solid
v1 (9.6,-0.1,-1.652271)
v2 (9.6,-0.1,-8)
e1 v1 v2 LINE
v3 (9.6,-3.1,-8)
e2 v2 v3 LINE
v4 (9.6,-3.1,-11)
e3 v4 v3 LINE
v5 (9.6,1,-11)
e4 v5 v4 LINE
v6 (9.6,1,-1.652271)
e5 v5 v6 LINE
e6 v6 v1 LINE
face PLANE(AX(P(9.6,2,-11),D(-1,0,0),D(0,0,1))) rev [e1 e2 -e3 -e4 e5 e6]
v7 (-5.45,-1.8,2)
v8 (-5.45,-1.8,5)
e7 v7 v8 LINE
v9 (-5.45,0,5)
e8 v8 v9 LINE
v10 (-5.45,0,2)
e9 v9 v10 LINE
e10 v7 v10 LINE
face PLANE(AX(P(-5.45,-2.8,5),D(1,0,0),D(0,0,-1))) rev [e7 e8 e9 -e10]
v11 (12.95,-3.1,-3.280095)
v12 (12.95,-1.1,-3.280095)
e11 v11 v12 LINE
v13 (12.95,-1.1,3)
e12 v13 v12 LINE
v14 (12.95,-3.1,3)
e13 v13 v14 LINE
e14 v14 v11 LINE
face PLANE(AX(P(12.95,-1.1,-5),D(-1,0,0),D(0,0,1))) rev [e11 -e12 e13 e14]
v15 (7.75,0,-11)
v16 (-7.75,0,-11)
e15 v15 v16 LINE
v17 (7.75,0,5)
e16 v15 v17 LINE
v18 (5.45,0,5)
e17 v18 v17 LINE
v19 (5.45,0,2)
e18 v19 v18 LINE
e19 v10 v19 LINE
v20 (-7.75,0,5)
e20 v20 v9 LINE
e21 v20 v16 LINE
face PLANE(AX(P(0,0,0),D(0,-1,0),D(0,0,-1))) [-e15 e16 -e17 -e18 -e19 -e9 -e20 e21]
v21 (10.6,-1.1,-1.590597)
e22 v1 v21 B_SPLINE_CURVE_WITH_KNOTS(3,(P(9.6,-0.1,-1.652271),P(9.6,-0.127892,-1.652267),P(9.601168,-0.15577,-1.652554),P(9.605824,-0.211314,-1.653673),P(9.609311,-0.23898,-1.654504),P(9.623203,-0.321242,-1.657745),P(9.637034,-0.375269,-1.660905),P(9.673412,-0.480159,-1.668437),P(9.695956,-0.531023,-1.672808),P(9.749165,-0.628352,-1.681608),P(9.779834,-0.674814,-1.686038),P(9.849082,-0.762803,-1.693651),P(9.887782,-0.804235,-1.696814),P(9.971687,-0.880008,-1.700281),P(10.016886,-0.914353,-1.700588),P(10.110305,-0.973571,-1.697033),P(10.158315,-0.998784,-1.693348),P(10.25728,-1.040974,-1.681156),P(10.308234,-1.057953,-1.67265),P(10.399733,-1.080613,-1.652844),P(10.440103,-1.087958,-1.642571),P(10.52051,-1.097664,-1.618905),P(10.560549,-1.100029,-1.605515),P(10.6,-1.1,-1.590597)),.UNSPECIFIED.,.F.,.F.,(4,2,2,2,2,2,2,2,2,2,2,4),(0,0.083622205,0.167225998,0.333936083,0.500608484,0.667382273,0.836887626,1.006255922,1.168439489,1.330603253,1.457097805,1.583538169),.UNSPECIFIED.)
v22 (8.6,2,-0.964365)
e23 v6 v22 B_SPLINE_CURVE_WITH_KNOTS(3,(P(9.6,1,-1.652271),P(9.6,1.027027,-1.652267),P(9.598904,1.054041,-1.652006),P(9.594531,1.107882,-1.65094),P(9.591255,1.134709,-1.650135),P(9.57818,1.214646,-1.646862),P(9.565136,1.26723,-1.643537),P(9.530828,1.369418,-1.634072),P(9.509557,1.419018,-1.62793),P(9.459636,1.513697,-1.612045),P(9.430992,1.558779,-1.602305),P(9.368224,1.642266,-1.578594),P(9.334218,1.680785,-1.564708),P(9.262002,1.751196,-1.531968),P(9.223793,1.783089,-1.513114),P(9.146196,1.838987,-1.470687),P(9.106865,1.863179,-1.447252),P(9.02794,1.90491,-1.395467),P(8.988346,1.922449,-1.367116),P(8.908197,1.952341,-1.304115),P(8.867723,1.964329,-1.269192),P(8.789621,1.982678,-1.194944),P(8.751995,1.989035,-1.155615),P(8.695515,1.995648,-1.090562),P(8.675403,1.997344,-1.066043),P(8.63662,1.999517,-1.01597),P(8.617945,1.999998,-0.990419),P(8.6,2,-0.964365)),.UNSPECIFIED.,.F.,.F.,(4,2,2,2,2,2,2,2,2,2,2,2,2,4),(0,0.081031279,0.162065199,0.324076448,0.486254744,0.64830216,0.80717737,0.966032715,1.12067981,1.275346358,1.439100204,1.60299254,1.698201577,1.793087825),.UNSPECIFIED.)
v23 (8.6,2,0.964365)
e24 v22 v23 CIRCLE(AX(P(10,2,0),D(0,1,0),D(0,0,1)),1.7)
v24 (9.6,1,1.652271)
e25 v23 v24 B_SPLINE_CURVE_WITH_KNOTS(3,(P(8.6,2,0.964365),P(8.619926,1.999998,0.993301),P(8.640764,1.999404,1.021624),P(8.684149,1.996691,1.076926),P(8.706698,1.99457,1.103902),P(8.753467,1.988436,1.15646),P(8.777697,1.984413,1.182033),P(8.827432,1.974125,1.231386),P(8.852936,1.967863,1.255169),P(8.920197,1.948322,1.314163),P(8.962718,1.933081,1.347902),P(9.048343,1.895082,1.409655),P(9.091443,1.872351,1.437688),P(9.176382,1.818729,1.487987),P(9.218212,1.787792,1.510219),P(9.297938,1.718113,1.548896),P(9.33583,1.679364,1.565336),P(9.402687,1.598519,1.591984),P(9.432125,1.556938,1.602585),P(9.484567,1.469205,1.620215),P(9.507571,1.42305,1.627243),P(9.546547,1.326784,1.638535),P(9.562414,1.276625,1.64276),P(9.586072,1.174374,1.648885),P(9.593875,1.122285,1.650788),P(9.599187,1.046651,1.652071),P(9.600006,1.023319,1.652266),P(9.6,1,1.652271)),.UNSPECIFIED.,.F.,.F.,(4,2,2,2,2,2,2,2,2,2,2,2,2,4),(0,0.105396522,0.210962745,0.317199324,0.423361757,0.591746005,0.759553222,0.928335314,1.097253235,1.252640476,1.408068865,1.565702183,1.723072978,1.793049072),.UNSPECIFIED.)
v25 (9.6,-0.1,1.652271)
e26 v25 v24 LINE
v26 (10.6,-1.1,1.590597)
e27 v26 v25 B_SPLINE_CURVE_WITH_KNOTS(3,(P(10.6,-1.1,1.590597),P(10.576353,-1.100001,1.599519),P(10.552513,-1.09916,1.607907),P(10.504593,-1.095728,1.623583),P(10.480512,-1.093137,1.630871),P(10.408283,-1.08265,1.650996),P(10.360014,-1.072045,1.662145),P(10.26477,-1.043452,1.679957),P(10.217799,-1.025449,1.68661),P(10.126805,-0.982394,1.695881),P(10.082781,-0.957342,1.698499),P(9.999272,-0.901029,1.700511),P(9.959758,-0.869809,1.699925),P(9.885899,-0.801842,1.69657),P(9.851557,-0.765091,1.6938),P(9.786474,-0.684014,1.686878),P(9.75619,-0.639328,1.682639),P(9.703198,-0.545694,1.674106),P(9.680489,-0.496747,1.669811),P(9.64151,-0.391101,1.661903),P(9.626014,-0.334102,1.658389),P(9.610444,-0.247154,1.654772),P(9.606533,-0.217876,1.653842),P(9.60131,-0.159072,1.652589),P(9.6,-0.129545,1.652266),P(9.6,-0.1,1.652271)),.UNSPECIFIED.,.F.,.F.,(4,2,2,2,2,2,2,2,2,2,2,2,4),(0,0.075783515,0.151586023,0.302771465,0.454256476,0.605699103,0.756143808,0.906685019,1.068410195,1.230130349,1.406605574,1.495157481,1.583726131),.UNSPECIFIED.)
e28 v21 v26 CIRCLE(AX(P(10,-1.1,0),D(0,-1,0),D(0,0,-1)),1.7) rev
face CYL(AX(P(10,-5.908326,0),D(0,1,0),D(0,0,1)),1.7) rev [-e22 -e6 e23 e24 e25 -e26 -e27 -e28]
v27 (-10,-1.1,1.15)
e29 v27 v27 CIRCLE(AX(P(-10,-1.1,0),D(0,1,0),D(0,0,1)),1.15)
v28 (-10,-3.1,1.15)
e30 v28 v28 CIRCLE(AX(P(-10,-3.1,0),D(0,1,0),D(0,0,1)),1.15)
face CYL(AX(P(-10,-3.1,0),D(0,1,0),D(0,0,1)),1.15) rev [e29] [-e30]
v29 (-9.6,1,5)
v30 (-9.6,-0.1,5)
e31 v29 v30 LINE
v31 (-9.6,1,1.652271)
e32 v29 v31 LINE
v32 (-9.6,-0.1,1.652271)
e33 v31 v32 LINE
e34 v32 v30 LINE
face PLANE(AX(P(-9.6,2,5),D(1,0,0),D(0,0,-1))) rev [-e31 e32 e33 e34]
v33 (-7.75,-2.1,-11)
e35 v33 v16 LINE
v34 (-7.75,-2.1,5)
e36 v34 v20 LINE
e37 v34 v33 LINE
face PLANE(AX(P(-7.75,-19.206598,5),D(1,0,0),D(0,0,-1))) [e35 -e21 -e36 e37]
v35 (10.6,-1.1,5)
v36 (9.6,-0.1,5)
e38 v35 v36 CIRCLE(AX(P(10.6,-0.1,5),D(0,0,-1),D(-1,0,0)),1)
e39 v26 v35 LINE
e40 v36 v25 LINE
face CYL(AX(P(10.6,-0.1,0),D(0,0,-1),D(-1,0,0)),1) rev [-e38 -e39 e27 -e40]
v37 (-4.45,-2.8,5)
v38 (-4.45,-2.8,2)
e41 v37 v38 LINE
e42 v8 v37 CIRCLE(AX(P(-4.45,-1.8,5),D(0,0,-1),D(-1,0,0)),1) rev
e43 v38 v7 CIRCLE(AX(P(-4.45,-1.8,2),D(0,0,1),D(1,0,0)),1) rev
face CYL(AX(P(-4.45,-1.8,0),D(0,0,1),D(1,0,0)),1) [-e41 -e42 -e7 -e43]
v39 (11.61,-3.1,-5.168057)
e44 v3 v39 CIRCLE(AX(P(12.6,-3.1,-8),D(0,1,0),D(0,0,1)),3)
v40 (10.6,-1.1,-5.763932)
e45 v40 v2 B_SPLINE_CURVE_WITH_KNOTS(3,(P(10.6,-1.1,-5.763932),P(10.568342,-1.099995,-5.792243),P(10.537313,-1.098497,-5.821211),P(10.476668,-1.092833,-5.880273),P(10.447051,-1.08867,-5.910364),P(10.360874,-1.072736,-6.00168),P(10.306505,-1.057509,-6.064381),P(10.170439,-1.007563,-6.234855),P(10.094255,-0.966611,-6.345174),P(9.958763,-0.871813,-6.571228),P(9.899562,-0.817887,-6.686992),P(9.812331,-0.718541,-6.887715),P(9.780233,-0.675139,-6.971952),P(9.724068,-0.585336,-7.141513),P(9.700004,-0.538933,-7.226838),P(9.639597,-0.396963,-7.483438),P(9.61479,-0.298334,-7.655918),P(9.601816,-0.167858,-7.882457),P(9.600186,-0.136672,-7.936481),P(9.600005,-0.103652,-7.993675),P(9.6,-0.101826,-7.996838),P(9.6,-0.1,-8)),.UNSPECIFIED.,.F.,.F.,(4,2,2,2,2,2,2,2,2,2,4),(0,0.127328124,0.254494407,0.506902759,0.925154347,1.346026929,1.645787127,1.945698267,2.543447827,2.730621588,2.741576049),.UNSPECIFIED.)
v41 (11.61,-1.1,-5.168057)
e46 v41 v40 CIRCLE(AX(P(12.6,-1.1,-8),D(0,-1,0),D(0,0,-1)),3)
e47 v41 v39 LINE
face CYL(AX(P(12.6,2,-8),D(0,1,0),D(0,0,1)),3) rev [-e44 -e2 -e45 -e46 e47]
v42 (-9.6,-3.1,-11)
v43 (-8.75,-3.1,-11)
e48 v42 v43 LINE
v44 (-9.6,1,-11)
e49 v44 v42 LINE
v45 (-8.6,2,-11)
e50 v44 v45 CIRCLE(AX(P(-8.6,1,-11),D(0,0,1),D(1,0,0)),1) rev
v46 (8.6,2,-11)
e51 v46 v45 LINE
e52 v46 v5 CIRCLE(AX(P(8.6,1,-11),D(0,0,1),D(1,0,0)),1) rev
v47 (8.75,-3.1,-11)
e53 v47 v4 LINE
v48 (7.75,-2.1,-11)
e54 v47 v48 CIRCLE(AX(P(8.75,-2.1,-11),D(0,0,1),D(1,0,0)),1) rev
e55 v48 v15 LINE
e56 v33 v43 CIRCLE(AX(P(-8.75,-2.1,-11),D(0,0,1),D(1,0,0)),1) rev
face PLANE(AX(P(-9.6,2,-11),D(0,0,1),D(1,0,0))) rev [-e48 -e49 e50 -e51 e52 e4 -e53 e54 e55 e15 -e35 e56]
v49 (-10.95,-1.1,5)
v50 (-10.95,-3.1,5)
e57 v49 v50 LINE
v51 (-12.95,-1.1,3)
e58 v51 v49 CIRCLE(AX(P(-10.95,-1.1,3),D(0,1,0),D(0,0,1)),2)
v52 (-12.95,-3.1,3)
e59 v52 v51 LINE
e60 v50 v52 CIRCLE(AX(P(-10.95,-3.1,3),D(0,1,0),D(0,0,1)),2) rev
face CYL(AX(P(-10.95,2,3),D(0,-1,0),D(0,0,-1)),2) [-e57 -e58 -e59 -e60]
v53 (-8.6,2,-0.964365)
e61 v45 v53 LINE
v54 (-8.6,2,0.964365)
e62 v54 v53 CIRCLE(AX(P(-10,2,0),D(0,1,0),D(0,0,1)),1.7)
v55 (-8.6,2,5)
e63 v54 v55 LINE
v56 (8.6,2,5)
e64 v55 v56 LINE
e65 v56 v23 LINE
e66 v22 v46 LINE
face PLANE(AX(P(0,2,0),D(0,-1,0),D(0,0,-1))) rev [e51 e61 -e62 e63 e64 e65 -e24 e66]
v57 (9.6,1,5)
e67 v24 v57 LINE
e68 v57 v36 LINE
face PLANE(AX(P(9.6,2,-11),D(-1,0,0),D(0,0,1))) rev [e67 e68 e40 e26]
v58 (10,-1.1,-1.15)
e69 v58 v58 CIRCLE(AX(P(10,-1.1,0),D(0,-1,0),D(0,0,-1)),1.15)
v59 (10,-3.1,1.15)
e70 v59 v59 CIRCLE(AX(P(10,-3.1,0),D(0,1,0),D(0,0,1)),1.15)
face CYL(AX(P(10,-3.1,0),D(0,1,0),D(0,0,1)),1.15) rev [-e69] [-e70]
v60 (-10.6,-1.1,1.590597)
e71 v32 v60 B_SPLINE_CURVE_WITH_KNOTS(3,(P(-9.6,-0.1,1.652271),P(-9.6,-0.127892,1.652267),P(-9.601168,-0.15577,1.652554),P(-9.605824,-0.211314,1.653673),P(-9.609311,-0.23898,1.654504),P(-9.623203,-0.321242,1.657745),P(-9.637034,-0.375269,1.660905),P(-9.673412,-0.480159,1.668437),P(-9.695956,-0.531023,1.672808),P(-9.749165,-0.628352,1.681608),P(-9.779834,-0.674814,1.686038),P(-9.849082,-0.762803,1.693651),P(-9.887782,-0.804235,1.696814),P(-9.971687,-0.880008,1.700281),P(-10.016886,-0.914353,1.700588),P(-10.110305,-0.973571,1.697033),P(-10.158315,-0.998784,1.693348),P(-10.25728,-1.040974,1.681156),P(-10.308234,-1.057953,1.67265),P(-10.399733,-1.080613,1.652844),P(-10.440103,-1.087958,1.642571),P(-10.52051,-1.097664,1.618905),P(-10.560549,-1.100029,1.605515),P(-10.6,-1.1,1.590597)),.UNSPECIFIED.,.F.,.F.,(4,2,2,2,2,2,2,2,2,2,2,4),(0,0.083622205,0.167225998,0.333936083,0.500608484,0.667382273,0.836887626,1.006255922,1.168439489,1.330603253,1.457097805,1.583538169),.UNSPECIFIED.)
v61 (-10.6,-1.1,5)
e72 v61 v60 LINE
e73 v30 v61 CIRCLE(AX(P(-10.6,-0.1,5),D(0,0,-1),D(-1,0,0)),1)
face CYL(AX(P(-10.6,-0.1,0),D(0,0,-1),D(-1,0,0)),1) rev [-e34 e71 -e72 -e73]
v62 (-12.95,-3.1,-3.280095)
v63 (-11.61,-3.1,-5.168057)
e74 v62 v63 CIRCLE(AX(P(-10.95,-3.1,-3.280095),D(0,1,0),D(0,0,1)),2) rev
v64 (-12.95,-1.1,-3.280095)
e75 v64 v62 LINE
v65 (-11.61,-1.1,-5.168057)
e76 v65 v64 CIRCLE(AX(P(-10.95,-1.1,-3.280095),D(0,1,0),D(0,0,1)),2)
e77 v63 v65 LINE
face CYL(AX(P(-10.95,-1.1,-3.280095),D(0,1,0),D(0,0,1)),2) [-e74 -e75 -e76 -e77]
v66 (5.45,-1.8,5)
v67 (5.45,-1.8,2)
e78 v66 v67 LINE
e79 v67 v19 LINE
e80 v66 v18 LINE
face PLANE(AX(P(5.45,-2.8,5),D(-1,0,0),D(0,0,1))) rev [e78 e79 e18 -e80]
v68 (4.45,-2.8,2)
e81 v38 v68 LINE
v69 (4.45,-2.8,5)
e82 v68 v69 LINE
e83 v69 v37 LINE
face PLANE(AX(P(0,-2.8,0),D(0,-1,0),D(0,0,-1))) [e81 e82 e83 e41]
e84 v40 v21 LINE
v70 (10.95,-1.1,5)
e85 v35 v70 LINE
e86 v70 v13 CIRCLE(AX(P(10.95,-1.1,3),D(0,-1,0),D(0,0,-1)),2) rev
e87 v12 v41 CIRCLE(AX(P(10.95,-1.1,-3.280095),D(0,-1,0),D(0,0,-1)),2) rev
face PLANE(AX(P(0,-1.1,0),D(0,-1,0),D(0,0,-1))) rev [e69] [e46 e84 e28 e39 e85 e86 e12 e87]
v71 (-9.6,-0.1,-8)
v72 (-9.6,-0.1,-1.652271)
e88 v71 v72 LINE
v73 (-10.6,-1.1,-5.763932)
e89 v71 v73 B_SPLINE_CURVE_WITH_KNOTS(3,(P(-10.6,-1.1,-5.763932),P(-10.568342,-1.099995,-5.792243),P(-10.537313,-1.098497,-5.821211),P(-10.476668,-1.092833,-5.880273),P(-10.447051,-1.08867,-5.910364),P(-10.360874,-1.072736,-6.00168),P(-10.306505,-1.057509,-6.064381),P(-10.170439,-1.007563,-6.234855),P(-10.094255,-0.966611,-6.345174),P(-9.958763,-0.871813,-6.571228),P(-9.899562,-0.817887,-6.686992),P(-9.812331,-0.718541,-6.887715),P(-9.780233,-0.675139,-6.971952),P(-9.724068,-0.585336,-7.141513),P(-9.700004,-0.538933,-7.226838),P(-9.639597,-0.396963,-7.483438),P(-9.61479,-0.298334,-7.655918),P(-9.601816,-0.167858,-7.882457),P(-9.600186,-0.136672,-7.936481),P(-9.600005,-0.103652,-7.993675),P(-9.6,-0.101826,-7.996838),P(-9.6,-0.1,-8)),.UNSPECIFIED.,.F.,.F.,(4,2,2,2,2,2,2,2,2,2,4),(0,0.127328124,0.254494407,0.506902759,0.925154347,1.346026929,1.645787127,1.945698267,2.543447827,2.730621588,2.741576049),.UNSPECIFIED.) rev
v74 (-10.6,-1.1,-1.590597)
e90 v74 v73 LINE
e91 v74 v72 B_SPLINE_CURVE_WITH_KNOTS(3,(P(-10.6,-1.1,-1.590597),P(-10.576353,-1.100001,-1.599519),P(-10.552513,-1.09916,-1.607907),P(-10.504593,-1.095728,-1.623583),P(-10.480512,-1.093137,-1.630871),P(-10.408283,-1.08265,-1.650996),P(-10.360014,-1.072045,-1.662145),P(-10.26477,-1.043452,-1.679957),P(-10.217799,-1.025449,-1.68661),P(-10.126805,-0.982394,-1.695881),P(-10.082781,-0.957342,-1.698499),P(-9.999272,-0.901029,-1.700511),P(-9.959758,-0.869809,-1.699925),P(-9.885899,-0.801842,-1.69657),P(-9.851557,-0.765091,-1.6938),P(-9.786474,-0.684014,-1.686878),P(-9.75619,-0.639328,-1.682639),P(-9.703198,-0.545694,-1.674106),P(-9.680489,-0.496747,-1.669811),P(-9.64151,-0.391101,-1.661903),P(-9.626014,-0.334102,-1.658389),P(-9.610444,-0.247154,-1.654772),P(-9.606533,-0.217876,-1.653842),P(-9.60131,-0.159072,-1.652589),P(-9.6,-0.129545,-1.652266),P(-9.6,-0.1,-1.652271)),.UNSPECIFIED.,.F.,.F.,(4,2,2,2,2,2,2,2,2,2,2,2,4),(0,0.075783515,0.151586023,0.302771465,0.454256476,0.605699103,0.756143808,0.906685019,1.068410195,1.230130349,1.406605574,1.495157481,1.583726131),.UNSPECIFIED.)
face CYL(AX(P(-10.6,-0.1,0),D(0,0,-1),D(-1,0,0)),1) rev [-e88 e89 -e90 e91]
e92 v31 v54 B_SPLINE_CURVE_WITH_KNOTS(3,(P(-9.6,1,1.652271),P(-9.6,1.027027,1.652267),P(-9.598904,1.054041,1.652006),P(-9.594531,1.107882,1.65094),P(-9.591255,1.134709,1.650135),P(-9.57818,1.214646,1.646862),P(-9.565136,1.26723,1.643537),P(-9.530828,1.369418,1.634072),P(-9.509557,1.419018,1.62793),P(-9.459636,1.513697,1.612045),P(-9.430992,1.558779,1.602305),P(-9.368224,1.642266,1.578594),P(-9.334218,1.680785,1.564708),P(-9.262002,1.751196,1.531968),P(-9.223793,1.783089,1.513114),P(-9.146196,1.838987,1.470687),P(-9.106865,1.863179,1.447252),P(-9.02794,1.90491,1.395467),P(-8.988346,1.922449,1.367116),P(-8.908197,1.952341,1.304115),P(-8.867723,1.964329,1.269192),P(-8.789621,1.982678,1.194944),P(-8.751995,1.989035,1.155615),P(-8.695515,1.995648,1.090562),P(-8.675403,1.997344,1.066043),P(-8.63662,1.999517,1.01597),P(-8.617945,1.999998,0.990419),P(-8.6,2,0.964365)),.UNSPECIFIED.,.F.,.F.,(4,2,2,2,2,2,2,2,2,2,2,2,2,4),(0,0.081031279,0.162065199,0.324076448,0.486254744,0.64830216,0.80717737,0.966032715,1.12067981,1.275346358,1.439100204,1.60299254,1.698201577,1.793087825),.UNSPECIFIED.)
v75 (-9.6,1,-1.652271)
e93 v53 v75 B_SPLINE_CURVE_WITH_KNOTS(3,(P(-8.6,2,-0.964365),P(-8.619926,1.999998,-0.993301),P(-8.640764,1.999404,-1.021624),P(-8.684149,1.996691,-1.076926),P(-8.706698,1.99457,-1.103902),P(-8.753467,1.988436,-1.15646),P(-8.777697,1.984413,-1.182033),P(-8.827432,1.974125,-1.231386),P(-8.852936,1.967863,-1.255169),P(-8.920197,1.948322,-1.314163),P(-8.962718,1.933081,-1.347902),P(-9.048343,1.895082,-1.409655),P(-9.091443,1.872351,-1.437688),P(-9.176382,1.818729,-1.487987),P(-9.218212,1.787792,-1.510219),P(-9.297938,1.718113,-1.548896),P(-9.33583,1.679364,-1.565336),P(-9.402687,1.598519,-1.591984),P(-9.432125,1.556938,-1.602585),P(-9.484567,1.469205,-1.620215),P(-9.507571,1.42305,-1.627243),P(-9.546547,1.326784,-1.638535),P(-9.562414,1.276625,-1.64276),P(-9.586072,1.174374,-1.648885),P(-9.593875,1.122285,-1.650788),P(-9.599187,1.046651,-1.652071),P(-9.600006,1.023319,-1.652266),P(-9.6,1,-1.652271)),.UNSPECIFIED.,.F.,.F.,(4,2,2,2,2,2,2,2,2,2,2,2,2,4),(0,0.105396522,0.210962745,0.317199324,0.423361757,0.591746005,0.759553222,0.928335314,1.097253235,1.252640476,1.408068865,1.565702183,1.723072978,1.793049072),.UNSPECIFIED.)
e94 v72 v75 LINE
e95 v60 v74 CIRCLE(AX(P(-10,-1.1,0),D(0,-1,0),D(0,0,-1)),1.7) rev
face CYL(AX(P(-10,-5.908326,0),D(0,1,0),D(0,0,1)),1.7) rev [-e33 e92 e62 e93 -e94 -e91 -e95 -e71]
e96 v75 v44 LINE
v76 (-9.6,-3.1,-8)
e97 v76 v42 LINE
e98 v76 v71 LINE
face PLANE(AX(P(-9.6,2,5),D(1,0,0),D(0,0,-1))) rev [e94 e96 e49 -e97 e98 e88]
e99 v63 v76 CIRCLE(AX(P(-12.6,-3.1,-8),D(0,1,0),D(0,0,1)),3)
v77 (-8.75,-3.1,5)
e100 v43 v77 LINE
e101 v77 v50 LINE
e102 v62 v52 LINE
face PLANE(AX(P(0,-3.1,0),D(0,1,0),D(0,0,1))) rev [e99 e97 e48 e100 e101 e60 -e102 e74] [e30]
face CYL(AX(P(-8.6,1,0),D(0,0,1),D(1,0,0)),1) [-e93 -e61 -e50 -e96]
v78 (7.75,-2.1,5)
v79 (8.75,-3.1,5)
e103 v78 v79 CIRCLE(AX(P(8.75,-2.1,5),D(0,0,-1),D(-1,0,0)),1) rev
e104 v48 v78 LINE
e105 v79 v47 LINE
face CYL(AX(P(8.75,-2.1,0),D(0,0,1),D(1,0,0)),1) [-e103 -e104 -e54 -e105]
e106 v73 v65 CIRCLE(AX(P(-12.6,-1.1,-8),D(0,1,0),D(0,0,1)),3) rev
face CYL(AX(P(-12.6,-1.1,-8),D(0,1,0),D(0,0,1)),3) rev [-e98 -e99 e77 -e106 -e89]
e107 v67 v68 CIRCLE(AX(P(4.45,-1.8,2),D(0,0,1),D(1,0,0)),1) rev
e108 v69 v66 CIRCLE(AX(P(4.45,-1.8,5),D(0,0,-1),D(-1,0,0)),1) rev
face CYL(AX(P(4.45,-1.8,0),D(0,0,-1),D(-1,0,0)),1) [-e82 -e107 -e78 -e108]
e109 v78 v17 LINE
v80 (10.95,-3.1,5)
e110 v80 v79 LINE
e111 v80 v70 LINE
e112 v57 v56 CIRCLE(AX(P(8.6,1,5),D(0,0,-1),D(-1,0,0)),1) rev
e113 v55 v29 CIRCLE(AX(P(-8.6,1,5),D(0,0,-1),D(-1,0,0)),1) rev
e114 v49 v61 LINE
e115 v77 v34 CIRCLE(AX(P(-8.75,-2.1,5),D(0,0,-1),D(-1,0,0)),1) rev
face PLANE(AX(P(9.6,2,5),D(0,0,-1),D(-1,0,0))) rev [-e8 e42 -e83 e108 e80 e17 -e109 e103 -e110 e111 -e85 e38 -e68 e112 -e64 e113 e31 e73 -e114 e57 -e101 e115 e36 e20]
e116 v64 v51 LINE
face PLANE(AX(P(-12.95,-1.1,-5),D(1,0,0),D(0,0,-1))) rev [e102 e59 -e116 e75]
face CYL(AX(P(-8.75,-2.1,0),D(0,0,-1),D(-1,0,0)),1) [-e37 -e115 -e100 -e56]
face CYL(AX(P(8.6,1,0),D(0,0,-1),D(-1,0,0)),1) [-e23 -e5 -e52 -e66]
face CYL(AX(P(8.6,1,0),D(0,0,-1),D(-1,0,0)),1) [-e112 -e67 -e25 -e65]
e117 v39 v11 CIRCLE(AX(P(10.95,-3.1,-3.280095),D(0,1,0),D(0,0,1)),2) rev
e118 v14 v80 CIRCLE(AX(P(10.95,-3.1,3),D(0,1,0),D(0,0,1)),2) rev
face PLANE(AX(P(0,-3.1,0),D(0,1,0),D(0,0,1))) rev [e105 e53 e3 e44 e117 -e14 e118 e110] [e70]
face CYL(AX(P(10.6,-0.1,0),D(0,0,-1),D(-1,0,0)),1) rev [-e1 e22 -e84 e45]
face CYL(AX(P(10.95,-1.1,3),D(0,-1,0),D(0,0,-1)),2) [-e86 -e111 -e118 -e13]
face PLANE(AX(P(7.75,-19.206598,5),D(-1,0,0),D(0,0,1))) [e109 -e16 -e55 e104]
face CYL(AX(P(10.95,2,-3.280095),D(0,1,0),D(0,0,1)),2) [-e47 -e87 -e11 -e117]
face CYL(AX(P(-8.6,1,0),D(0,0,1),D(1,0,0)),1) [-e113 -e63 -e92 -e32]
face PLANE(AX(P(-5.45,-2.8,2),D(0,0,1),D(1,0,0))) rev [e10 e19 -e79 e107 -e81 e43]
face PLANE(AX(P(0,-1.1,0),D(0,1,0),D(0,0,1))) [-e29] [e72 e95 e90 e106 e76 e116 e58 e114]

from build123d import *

# Parameters (mm, degrees)
BOSS_EXTRUDE1_DEPTH = 2
SKETCH3_W           = 1.85
SKETCH3_H           = 16
BOSS_EXTRUDE2_DEPTH = 3.1
SKETCH4_W           = 3.35
SKETCH4_H           = 10
BOSS_EXTRUDE3_DEPTH = 2
SKETCH5_W           = 10.9
SKETCH5_H           = 3
BOSS_EXTRUDE4_DEPTH = 2.8
FILLET2_R           = 1
SKETCH7_R           = 1.15
CUT_EXTRUDE2_DEPTH  = 18.740138105
CUT_EXTRUDE3_REACH  = 19.74
SKETCH8_R           = 1.7
FILLET3_START       = -6.300522805
FILLET3_DEPTH       = 1.300522805
FILLET3_START_2     = -8.0000001
FILLET3_2_DEPTH     = 1.699477295
FILLET3_3_DEPTH     = 1.300522805
FILLET3_START_3     = -1.1
FILLET3_4_DEPTH     = 2.1
FILLET3_START_4     = -3.1
FILLET3_5_DEPTH     = 2
FILLET4_R           = 2


with BuildPart() as part:
    # Sketch2 → Boss-Extrude1 (new body)
    with BuildSketch(Plane(origin=(0, 0, 0), x_dir=(1, 0, 0), z_dir=(0, 1, 0))):
        Polygon((9.6, -5), (-9.6, -5), (-9.6, 5), (-9.6, 11), (9.6, 11), (9.6, 5), align=None)
    extrude(amount=BOSS_EXTRUDE1_DEPTH)

    # Sketch3 → Boss-Extrude2 (add)
    with BuildSketch(Plane(origin=(0, 0, 0), x_dir=(1, 0, 0), z_dir=(0, 1, 0))):
        with Locations((-8.675, 3)):
            Rectangle(SKETCH3_W, SKETCH3_H)
        with Locations((8.675, 3)):
            Rectangle(SKETCH3_W, SKETCH3_H)
    extrude(amount=-BOSS_EXTRUDE2_DEPTH)

    # Sketch4 → Boss-Extrude3 (add)
    with BuildSketch(Plane(origin=(0, -3.1, 0), x_dir=(1, 0, 0), z_dir=(0, 1, 0))):
        with Locations((-11.275, 0)):
            Rectangle(SKETCH4_W, SKETCH4_H)
        with Locations((11.275, 0)):
            Rectangle(SKETCH4_W, SKETCH4_H)
    extrude(amount=BOSS_EXTRUDE3_DEPTH)

    # Sketch5 → Boss-Extrude4 (add)
    with BuildSketch(Plane.XZ):
        with Locations((0, 3.5)):
            Rectangle(SKETCH5_W, SKETCH5_H)
    extrude(amount=BOSS_EXTRUDE4_DEPTH)

    # Fillet2
    fillet2_edges = [part.edges().sort_by_distance(p)[0] for p in [
        (-9.6, 2, -3),
        (-7.75, -3.1, -3),
        (7.75, -3.1, -3),
        (9.6, 2, -3),
        (-9.6, -1.1, 0),
        (9.6, -1.1, 0),
        (-5.45, -2.8, 3.5),
        (5.45, -2.8, 3.5),
    ]]
    fillet(fillet2_edges, radius=FILLET2_R)

    # Sketch7 → Cut-Extrude2 (cut, through all)
    with BuildSketch(Plane(origin=(0, 2, 0), x_dir=(1, 0, 0), z_dir=(0, 1, 0))):
        with Locations(Location((-10, 0, 0), (0, 0, 270))):
            Circle(SKETCH7_R)
        with Locations(Location((10, 0, 0), (0, 0, 270))):
            Circle(SKETCH7_R)
    extrude(amount=-CUT_EXTRUDE2_DEPTH, mode=Mode.SUBTRACT)

    # Cut-Extrude3: up to this face of the body (flat: up to its plane)
    cut_extrude3_end = Plane(part.part.faces().sort_by_distance((11.806864318, -1.1, 0))[0])
    # Sketch8 → Cut-Extrude3 (cut, up to the picked face)
    with BuildSketch(Plane(origin=(0, 2, 0), x_dir=(1, 0, 0), z_dir=(0, 1, 0)), mode=Mode.PRIVATE) as cut_extrude3_sk1:
        with Locations((-10, 0)):
            Circle(SKETCH8_R)
    cut_extrude3_tool1 = split(extrude(cut_extrude3_sk1.sketch, amount=-CUT_EXTRUDE3_REACH, mode=Mode.PRIVATE), bisect_by=cut_extrude3_end, keep=Keep.BOTH, mode=Mode.PRIVATE)
    # Sketch8 → Cut-Extrude3 (cut, up to the picked face)
    with BuildSketch(Plane(origin=(0, 2, 0), x_dir=(1, 0, 0), z_dir=(0, 1, 0)), mode=Mode.PRIVATE) as cut_extrude3_sk2:
        with Locations((10, 0)):
            Circle(SKETCH8_R)
    cut_extrude3_tool2 = split(extrude(cut_extrude3_sk2.sketch, amount=-CUT_EXTRUDE3_REACH, mode=Mode.PRIVATE), bisect_by=cut_extrude3_end, keep=Keep.BOTH, mode=Mode.PRIVATE)
    add(cut_extrude3_tool1.solids().sort_by(Axis((-10, 2, 0), (0, -1, 0)))[0], mode=Mode.SUBTRACT)
    add(cut_extrude3_tool2.solids().sort_by(Axis((10, 2, 0), (0, -1, 0)))[0], mode=Mode.SUBTRACT)

    # Fillet3: read off the stored shape, not the designer's step
    # Fillet3 outline → Fillet3 (add)
    with BuildSketch(Plane.XY.offset(FILLET3_START)):
        with BuildLine():
            Line((9.6, -1.1), (10.6, -1.1))
            ThreePointArc((10.6, -1.1), (9.892893219, -0.807106781), (9.6, -0.1))
            Line((9.6, -0.1), (9.6, -1.1))
        make_face()
    extrude(amount=FILLET3_DEPTH)

    # Fillet3 2 outline → Fillet3 2 (add)
    with BuildSketch(Plane.XY.offset(FILLET3_START_2)):
        with BuildLine():
            Line((-9.6, -1.1), (-9.6, -0.1))
            ThreePointArc((-9.6, -0.1), (-9.892893219, -0.807106781), (-10.6, -1.1))
            Line((-10.6, -1.1), (-9.6, -1.1))
        make_face()
        with BuildLine():
            Line((9.6, -1.1), (10.6, -1.1))
            ThreePointArc((10.6, -1.1), (9.892893219, -0.807106781), (9.6, -0.1))
            Line((9.6, -0.1), (9.6, -1.1))
        make_face()
    extrude(amount=FILLET3_2_DEPTH)

    # Fillet3 3 outline → Fillet3 3 (add)
    with BuildSketch(Plane.XY.offset(FILLET3_START)):
        with BuildLine():
            Line((-9.6, -1.1), (-9.6, -0.1))
            ThreePointArc((-9.6, -0.1), (-9.892893219, -0.807106781), (-10.6, -1.1))
            Line((-10.6, -1.1), (-9.6, -1.1))
        make_face()
    extrude(amount=FILLET3_3_DEPTH)

    # Fillet3 4 outline → Fillet3 4 (cut)
    with BuildSketch(Plane(origin=(0, 0, 0), x_dir=(1, 0, 0), z_dir=(0, 1, 0)).offset(FILLET3_START_3)):
        with BuildLine():
            Line((14, 8.0000001), (9.6, 8))
            ThreePointArc((9.6, 8), (10.478679656, 5.878679656), (12.6, 5))
            Line((12.6, 5), (12.95, 5))
            Line((12.95, 5), (14, 5.000000001))
            Line((14, 5.000000001), (14, 8.0000001))
        make_face()
        with BuildLine():
            Line((-12.95, 5), (-12.6, 5))
            ThreePointArc((-12.6, 5), (-10.478679656, 5.878679656), (-9.6, 8))
            Line((-9.6, 8), (-14, 8.0000001))
            Line((-14, 8.0000001), (-14, 5))
            Line((-14, 5), (-12.95, 5))
        make_face()
    extrude(amount=FILLET3_4_DEPTH, mode=Mode.SUBTRACT)

    # Fillet3 5 outline → Fillet3 5 (add)
    with BuildSketch(Plane(origin=(0, 0, 0), x_dir=(1, 0, 0), z_dir=(0, 1, 0)).offset(FILLET3_START_4)):
        with BuildLine():
            ThreePointArc((12.6, 5), (10.478679656, 5.878679656), (9.6, 8))
            Line((9.6, 8), (9.6, 5))
            Line((9.6, 5), (12.6, 5))
        make_face()
        with BuildLine():
            Line((-12.6, 5), (-9.6, 5))
            Line((-9.6, 5), (-9.6, 8))
            ThreePointArc((-9.6, 8), (-10.478679656, 5.878679656), (-12.6, 5))
        make_face()
    extrude(amount=FILLET3_5_DEPTH)

    # Fillet4
    fillet4_edges = [part.edges().sort_by_distance(p)[0] for p in [
        (12.95, -2.1, -5),
        (12.95, -2.1, 5),
        (-12.95, -2.1, -5),
        (-12.95, -2.1, 5),
    ]]
    fillet(fillet4_edges, radius=FILLET4_R)


solid = part.part
